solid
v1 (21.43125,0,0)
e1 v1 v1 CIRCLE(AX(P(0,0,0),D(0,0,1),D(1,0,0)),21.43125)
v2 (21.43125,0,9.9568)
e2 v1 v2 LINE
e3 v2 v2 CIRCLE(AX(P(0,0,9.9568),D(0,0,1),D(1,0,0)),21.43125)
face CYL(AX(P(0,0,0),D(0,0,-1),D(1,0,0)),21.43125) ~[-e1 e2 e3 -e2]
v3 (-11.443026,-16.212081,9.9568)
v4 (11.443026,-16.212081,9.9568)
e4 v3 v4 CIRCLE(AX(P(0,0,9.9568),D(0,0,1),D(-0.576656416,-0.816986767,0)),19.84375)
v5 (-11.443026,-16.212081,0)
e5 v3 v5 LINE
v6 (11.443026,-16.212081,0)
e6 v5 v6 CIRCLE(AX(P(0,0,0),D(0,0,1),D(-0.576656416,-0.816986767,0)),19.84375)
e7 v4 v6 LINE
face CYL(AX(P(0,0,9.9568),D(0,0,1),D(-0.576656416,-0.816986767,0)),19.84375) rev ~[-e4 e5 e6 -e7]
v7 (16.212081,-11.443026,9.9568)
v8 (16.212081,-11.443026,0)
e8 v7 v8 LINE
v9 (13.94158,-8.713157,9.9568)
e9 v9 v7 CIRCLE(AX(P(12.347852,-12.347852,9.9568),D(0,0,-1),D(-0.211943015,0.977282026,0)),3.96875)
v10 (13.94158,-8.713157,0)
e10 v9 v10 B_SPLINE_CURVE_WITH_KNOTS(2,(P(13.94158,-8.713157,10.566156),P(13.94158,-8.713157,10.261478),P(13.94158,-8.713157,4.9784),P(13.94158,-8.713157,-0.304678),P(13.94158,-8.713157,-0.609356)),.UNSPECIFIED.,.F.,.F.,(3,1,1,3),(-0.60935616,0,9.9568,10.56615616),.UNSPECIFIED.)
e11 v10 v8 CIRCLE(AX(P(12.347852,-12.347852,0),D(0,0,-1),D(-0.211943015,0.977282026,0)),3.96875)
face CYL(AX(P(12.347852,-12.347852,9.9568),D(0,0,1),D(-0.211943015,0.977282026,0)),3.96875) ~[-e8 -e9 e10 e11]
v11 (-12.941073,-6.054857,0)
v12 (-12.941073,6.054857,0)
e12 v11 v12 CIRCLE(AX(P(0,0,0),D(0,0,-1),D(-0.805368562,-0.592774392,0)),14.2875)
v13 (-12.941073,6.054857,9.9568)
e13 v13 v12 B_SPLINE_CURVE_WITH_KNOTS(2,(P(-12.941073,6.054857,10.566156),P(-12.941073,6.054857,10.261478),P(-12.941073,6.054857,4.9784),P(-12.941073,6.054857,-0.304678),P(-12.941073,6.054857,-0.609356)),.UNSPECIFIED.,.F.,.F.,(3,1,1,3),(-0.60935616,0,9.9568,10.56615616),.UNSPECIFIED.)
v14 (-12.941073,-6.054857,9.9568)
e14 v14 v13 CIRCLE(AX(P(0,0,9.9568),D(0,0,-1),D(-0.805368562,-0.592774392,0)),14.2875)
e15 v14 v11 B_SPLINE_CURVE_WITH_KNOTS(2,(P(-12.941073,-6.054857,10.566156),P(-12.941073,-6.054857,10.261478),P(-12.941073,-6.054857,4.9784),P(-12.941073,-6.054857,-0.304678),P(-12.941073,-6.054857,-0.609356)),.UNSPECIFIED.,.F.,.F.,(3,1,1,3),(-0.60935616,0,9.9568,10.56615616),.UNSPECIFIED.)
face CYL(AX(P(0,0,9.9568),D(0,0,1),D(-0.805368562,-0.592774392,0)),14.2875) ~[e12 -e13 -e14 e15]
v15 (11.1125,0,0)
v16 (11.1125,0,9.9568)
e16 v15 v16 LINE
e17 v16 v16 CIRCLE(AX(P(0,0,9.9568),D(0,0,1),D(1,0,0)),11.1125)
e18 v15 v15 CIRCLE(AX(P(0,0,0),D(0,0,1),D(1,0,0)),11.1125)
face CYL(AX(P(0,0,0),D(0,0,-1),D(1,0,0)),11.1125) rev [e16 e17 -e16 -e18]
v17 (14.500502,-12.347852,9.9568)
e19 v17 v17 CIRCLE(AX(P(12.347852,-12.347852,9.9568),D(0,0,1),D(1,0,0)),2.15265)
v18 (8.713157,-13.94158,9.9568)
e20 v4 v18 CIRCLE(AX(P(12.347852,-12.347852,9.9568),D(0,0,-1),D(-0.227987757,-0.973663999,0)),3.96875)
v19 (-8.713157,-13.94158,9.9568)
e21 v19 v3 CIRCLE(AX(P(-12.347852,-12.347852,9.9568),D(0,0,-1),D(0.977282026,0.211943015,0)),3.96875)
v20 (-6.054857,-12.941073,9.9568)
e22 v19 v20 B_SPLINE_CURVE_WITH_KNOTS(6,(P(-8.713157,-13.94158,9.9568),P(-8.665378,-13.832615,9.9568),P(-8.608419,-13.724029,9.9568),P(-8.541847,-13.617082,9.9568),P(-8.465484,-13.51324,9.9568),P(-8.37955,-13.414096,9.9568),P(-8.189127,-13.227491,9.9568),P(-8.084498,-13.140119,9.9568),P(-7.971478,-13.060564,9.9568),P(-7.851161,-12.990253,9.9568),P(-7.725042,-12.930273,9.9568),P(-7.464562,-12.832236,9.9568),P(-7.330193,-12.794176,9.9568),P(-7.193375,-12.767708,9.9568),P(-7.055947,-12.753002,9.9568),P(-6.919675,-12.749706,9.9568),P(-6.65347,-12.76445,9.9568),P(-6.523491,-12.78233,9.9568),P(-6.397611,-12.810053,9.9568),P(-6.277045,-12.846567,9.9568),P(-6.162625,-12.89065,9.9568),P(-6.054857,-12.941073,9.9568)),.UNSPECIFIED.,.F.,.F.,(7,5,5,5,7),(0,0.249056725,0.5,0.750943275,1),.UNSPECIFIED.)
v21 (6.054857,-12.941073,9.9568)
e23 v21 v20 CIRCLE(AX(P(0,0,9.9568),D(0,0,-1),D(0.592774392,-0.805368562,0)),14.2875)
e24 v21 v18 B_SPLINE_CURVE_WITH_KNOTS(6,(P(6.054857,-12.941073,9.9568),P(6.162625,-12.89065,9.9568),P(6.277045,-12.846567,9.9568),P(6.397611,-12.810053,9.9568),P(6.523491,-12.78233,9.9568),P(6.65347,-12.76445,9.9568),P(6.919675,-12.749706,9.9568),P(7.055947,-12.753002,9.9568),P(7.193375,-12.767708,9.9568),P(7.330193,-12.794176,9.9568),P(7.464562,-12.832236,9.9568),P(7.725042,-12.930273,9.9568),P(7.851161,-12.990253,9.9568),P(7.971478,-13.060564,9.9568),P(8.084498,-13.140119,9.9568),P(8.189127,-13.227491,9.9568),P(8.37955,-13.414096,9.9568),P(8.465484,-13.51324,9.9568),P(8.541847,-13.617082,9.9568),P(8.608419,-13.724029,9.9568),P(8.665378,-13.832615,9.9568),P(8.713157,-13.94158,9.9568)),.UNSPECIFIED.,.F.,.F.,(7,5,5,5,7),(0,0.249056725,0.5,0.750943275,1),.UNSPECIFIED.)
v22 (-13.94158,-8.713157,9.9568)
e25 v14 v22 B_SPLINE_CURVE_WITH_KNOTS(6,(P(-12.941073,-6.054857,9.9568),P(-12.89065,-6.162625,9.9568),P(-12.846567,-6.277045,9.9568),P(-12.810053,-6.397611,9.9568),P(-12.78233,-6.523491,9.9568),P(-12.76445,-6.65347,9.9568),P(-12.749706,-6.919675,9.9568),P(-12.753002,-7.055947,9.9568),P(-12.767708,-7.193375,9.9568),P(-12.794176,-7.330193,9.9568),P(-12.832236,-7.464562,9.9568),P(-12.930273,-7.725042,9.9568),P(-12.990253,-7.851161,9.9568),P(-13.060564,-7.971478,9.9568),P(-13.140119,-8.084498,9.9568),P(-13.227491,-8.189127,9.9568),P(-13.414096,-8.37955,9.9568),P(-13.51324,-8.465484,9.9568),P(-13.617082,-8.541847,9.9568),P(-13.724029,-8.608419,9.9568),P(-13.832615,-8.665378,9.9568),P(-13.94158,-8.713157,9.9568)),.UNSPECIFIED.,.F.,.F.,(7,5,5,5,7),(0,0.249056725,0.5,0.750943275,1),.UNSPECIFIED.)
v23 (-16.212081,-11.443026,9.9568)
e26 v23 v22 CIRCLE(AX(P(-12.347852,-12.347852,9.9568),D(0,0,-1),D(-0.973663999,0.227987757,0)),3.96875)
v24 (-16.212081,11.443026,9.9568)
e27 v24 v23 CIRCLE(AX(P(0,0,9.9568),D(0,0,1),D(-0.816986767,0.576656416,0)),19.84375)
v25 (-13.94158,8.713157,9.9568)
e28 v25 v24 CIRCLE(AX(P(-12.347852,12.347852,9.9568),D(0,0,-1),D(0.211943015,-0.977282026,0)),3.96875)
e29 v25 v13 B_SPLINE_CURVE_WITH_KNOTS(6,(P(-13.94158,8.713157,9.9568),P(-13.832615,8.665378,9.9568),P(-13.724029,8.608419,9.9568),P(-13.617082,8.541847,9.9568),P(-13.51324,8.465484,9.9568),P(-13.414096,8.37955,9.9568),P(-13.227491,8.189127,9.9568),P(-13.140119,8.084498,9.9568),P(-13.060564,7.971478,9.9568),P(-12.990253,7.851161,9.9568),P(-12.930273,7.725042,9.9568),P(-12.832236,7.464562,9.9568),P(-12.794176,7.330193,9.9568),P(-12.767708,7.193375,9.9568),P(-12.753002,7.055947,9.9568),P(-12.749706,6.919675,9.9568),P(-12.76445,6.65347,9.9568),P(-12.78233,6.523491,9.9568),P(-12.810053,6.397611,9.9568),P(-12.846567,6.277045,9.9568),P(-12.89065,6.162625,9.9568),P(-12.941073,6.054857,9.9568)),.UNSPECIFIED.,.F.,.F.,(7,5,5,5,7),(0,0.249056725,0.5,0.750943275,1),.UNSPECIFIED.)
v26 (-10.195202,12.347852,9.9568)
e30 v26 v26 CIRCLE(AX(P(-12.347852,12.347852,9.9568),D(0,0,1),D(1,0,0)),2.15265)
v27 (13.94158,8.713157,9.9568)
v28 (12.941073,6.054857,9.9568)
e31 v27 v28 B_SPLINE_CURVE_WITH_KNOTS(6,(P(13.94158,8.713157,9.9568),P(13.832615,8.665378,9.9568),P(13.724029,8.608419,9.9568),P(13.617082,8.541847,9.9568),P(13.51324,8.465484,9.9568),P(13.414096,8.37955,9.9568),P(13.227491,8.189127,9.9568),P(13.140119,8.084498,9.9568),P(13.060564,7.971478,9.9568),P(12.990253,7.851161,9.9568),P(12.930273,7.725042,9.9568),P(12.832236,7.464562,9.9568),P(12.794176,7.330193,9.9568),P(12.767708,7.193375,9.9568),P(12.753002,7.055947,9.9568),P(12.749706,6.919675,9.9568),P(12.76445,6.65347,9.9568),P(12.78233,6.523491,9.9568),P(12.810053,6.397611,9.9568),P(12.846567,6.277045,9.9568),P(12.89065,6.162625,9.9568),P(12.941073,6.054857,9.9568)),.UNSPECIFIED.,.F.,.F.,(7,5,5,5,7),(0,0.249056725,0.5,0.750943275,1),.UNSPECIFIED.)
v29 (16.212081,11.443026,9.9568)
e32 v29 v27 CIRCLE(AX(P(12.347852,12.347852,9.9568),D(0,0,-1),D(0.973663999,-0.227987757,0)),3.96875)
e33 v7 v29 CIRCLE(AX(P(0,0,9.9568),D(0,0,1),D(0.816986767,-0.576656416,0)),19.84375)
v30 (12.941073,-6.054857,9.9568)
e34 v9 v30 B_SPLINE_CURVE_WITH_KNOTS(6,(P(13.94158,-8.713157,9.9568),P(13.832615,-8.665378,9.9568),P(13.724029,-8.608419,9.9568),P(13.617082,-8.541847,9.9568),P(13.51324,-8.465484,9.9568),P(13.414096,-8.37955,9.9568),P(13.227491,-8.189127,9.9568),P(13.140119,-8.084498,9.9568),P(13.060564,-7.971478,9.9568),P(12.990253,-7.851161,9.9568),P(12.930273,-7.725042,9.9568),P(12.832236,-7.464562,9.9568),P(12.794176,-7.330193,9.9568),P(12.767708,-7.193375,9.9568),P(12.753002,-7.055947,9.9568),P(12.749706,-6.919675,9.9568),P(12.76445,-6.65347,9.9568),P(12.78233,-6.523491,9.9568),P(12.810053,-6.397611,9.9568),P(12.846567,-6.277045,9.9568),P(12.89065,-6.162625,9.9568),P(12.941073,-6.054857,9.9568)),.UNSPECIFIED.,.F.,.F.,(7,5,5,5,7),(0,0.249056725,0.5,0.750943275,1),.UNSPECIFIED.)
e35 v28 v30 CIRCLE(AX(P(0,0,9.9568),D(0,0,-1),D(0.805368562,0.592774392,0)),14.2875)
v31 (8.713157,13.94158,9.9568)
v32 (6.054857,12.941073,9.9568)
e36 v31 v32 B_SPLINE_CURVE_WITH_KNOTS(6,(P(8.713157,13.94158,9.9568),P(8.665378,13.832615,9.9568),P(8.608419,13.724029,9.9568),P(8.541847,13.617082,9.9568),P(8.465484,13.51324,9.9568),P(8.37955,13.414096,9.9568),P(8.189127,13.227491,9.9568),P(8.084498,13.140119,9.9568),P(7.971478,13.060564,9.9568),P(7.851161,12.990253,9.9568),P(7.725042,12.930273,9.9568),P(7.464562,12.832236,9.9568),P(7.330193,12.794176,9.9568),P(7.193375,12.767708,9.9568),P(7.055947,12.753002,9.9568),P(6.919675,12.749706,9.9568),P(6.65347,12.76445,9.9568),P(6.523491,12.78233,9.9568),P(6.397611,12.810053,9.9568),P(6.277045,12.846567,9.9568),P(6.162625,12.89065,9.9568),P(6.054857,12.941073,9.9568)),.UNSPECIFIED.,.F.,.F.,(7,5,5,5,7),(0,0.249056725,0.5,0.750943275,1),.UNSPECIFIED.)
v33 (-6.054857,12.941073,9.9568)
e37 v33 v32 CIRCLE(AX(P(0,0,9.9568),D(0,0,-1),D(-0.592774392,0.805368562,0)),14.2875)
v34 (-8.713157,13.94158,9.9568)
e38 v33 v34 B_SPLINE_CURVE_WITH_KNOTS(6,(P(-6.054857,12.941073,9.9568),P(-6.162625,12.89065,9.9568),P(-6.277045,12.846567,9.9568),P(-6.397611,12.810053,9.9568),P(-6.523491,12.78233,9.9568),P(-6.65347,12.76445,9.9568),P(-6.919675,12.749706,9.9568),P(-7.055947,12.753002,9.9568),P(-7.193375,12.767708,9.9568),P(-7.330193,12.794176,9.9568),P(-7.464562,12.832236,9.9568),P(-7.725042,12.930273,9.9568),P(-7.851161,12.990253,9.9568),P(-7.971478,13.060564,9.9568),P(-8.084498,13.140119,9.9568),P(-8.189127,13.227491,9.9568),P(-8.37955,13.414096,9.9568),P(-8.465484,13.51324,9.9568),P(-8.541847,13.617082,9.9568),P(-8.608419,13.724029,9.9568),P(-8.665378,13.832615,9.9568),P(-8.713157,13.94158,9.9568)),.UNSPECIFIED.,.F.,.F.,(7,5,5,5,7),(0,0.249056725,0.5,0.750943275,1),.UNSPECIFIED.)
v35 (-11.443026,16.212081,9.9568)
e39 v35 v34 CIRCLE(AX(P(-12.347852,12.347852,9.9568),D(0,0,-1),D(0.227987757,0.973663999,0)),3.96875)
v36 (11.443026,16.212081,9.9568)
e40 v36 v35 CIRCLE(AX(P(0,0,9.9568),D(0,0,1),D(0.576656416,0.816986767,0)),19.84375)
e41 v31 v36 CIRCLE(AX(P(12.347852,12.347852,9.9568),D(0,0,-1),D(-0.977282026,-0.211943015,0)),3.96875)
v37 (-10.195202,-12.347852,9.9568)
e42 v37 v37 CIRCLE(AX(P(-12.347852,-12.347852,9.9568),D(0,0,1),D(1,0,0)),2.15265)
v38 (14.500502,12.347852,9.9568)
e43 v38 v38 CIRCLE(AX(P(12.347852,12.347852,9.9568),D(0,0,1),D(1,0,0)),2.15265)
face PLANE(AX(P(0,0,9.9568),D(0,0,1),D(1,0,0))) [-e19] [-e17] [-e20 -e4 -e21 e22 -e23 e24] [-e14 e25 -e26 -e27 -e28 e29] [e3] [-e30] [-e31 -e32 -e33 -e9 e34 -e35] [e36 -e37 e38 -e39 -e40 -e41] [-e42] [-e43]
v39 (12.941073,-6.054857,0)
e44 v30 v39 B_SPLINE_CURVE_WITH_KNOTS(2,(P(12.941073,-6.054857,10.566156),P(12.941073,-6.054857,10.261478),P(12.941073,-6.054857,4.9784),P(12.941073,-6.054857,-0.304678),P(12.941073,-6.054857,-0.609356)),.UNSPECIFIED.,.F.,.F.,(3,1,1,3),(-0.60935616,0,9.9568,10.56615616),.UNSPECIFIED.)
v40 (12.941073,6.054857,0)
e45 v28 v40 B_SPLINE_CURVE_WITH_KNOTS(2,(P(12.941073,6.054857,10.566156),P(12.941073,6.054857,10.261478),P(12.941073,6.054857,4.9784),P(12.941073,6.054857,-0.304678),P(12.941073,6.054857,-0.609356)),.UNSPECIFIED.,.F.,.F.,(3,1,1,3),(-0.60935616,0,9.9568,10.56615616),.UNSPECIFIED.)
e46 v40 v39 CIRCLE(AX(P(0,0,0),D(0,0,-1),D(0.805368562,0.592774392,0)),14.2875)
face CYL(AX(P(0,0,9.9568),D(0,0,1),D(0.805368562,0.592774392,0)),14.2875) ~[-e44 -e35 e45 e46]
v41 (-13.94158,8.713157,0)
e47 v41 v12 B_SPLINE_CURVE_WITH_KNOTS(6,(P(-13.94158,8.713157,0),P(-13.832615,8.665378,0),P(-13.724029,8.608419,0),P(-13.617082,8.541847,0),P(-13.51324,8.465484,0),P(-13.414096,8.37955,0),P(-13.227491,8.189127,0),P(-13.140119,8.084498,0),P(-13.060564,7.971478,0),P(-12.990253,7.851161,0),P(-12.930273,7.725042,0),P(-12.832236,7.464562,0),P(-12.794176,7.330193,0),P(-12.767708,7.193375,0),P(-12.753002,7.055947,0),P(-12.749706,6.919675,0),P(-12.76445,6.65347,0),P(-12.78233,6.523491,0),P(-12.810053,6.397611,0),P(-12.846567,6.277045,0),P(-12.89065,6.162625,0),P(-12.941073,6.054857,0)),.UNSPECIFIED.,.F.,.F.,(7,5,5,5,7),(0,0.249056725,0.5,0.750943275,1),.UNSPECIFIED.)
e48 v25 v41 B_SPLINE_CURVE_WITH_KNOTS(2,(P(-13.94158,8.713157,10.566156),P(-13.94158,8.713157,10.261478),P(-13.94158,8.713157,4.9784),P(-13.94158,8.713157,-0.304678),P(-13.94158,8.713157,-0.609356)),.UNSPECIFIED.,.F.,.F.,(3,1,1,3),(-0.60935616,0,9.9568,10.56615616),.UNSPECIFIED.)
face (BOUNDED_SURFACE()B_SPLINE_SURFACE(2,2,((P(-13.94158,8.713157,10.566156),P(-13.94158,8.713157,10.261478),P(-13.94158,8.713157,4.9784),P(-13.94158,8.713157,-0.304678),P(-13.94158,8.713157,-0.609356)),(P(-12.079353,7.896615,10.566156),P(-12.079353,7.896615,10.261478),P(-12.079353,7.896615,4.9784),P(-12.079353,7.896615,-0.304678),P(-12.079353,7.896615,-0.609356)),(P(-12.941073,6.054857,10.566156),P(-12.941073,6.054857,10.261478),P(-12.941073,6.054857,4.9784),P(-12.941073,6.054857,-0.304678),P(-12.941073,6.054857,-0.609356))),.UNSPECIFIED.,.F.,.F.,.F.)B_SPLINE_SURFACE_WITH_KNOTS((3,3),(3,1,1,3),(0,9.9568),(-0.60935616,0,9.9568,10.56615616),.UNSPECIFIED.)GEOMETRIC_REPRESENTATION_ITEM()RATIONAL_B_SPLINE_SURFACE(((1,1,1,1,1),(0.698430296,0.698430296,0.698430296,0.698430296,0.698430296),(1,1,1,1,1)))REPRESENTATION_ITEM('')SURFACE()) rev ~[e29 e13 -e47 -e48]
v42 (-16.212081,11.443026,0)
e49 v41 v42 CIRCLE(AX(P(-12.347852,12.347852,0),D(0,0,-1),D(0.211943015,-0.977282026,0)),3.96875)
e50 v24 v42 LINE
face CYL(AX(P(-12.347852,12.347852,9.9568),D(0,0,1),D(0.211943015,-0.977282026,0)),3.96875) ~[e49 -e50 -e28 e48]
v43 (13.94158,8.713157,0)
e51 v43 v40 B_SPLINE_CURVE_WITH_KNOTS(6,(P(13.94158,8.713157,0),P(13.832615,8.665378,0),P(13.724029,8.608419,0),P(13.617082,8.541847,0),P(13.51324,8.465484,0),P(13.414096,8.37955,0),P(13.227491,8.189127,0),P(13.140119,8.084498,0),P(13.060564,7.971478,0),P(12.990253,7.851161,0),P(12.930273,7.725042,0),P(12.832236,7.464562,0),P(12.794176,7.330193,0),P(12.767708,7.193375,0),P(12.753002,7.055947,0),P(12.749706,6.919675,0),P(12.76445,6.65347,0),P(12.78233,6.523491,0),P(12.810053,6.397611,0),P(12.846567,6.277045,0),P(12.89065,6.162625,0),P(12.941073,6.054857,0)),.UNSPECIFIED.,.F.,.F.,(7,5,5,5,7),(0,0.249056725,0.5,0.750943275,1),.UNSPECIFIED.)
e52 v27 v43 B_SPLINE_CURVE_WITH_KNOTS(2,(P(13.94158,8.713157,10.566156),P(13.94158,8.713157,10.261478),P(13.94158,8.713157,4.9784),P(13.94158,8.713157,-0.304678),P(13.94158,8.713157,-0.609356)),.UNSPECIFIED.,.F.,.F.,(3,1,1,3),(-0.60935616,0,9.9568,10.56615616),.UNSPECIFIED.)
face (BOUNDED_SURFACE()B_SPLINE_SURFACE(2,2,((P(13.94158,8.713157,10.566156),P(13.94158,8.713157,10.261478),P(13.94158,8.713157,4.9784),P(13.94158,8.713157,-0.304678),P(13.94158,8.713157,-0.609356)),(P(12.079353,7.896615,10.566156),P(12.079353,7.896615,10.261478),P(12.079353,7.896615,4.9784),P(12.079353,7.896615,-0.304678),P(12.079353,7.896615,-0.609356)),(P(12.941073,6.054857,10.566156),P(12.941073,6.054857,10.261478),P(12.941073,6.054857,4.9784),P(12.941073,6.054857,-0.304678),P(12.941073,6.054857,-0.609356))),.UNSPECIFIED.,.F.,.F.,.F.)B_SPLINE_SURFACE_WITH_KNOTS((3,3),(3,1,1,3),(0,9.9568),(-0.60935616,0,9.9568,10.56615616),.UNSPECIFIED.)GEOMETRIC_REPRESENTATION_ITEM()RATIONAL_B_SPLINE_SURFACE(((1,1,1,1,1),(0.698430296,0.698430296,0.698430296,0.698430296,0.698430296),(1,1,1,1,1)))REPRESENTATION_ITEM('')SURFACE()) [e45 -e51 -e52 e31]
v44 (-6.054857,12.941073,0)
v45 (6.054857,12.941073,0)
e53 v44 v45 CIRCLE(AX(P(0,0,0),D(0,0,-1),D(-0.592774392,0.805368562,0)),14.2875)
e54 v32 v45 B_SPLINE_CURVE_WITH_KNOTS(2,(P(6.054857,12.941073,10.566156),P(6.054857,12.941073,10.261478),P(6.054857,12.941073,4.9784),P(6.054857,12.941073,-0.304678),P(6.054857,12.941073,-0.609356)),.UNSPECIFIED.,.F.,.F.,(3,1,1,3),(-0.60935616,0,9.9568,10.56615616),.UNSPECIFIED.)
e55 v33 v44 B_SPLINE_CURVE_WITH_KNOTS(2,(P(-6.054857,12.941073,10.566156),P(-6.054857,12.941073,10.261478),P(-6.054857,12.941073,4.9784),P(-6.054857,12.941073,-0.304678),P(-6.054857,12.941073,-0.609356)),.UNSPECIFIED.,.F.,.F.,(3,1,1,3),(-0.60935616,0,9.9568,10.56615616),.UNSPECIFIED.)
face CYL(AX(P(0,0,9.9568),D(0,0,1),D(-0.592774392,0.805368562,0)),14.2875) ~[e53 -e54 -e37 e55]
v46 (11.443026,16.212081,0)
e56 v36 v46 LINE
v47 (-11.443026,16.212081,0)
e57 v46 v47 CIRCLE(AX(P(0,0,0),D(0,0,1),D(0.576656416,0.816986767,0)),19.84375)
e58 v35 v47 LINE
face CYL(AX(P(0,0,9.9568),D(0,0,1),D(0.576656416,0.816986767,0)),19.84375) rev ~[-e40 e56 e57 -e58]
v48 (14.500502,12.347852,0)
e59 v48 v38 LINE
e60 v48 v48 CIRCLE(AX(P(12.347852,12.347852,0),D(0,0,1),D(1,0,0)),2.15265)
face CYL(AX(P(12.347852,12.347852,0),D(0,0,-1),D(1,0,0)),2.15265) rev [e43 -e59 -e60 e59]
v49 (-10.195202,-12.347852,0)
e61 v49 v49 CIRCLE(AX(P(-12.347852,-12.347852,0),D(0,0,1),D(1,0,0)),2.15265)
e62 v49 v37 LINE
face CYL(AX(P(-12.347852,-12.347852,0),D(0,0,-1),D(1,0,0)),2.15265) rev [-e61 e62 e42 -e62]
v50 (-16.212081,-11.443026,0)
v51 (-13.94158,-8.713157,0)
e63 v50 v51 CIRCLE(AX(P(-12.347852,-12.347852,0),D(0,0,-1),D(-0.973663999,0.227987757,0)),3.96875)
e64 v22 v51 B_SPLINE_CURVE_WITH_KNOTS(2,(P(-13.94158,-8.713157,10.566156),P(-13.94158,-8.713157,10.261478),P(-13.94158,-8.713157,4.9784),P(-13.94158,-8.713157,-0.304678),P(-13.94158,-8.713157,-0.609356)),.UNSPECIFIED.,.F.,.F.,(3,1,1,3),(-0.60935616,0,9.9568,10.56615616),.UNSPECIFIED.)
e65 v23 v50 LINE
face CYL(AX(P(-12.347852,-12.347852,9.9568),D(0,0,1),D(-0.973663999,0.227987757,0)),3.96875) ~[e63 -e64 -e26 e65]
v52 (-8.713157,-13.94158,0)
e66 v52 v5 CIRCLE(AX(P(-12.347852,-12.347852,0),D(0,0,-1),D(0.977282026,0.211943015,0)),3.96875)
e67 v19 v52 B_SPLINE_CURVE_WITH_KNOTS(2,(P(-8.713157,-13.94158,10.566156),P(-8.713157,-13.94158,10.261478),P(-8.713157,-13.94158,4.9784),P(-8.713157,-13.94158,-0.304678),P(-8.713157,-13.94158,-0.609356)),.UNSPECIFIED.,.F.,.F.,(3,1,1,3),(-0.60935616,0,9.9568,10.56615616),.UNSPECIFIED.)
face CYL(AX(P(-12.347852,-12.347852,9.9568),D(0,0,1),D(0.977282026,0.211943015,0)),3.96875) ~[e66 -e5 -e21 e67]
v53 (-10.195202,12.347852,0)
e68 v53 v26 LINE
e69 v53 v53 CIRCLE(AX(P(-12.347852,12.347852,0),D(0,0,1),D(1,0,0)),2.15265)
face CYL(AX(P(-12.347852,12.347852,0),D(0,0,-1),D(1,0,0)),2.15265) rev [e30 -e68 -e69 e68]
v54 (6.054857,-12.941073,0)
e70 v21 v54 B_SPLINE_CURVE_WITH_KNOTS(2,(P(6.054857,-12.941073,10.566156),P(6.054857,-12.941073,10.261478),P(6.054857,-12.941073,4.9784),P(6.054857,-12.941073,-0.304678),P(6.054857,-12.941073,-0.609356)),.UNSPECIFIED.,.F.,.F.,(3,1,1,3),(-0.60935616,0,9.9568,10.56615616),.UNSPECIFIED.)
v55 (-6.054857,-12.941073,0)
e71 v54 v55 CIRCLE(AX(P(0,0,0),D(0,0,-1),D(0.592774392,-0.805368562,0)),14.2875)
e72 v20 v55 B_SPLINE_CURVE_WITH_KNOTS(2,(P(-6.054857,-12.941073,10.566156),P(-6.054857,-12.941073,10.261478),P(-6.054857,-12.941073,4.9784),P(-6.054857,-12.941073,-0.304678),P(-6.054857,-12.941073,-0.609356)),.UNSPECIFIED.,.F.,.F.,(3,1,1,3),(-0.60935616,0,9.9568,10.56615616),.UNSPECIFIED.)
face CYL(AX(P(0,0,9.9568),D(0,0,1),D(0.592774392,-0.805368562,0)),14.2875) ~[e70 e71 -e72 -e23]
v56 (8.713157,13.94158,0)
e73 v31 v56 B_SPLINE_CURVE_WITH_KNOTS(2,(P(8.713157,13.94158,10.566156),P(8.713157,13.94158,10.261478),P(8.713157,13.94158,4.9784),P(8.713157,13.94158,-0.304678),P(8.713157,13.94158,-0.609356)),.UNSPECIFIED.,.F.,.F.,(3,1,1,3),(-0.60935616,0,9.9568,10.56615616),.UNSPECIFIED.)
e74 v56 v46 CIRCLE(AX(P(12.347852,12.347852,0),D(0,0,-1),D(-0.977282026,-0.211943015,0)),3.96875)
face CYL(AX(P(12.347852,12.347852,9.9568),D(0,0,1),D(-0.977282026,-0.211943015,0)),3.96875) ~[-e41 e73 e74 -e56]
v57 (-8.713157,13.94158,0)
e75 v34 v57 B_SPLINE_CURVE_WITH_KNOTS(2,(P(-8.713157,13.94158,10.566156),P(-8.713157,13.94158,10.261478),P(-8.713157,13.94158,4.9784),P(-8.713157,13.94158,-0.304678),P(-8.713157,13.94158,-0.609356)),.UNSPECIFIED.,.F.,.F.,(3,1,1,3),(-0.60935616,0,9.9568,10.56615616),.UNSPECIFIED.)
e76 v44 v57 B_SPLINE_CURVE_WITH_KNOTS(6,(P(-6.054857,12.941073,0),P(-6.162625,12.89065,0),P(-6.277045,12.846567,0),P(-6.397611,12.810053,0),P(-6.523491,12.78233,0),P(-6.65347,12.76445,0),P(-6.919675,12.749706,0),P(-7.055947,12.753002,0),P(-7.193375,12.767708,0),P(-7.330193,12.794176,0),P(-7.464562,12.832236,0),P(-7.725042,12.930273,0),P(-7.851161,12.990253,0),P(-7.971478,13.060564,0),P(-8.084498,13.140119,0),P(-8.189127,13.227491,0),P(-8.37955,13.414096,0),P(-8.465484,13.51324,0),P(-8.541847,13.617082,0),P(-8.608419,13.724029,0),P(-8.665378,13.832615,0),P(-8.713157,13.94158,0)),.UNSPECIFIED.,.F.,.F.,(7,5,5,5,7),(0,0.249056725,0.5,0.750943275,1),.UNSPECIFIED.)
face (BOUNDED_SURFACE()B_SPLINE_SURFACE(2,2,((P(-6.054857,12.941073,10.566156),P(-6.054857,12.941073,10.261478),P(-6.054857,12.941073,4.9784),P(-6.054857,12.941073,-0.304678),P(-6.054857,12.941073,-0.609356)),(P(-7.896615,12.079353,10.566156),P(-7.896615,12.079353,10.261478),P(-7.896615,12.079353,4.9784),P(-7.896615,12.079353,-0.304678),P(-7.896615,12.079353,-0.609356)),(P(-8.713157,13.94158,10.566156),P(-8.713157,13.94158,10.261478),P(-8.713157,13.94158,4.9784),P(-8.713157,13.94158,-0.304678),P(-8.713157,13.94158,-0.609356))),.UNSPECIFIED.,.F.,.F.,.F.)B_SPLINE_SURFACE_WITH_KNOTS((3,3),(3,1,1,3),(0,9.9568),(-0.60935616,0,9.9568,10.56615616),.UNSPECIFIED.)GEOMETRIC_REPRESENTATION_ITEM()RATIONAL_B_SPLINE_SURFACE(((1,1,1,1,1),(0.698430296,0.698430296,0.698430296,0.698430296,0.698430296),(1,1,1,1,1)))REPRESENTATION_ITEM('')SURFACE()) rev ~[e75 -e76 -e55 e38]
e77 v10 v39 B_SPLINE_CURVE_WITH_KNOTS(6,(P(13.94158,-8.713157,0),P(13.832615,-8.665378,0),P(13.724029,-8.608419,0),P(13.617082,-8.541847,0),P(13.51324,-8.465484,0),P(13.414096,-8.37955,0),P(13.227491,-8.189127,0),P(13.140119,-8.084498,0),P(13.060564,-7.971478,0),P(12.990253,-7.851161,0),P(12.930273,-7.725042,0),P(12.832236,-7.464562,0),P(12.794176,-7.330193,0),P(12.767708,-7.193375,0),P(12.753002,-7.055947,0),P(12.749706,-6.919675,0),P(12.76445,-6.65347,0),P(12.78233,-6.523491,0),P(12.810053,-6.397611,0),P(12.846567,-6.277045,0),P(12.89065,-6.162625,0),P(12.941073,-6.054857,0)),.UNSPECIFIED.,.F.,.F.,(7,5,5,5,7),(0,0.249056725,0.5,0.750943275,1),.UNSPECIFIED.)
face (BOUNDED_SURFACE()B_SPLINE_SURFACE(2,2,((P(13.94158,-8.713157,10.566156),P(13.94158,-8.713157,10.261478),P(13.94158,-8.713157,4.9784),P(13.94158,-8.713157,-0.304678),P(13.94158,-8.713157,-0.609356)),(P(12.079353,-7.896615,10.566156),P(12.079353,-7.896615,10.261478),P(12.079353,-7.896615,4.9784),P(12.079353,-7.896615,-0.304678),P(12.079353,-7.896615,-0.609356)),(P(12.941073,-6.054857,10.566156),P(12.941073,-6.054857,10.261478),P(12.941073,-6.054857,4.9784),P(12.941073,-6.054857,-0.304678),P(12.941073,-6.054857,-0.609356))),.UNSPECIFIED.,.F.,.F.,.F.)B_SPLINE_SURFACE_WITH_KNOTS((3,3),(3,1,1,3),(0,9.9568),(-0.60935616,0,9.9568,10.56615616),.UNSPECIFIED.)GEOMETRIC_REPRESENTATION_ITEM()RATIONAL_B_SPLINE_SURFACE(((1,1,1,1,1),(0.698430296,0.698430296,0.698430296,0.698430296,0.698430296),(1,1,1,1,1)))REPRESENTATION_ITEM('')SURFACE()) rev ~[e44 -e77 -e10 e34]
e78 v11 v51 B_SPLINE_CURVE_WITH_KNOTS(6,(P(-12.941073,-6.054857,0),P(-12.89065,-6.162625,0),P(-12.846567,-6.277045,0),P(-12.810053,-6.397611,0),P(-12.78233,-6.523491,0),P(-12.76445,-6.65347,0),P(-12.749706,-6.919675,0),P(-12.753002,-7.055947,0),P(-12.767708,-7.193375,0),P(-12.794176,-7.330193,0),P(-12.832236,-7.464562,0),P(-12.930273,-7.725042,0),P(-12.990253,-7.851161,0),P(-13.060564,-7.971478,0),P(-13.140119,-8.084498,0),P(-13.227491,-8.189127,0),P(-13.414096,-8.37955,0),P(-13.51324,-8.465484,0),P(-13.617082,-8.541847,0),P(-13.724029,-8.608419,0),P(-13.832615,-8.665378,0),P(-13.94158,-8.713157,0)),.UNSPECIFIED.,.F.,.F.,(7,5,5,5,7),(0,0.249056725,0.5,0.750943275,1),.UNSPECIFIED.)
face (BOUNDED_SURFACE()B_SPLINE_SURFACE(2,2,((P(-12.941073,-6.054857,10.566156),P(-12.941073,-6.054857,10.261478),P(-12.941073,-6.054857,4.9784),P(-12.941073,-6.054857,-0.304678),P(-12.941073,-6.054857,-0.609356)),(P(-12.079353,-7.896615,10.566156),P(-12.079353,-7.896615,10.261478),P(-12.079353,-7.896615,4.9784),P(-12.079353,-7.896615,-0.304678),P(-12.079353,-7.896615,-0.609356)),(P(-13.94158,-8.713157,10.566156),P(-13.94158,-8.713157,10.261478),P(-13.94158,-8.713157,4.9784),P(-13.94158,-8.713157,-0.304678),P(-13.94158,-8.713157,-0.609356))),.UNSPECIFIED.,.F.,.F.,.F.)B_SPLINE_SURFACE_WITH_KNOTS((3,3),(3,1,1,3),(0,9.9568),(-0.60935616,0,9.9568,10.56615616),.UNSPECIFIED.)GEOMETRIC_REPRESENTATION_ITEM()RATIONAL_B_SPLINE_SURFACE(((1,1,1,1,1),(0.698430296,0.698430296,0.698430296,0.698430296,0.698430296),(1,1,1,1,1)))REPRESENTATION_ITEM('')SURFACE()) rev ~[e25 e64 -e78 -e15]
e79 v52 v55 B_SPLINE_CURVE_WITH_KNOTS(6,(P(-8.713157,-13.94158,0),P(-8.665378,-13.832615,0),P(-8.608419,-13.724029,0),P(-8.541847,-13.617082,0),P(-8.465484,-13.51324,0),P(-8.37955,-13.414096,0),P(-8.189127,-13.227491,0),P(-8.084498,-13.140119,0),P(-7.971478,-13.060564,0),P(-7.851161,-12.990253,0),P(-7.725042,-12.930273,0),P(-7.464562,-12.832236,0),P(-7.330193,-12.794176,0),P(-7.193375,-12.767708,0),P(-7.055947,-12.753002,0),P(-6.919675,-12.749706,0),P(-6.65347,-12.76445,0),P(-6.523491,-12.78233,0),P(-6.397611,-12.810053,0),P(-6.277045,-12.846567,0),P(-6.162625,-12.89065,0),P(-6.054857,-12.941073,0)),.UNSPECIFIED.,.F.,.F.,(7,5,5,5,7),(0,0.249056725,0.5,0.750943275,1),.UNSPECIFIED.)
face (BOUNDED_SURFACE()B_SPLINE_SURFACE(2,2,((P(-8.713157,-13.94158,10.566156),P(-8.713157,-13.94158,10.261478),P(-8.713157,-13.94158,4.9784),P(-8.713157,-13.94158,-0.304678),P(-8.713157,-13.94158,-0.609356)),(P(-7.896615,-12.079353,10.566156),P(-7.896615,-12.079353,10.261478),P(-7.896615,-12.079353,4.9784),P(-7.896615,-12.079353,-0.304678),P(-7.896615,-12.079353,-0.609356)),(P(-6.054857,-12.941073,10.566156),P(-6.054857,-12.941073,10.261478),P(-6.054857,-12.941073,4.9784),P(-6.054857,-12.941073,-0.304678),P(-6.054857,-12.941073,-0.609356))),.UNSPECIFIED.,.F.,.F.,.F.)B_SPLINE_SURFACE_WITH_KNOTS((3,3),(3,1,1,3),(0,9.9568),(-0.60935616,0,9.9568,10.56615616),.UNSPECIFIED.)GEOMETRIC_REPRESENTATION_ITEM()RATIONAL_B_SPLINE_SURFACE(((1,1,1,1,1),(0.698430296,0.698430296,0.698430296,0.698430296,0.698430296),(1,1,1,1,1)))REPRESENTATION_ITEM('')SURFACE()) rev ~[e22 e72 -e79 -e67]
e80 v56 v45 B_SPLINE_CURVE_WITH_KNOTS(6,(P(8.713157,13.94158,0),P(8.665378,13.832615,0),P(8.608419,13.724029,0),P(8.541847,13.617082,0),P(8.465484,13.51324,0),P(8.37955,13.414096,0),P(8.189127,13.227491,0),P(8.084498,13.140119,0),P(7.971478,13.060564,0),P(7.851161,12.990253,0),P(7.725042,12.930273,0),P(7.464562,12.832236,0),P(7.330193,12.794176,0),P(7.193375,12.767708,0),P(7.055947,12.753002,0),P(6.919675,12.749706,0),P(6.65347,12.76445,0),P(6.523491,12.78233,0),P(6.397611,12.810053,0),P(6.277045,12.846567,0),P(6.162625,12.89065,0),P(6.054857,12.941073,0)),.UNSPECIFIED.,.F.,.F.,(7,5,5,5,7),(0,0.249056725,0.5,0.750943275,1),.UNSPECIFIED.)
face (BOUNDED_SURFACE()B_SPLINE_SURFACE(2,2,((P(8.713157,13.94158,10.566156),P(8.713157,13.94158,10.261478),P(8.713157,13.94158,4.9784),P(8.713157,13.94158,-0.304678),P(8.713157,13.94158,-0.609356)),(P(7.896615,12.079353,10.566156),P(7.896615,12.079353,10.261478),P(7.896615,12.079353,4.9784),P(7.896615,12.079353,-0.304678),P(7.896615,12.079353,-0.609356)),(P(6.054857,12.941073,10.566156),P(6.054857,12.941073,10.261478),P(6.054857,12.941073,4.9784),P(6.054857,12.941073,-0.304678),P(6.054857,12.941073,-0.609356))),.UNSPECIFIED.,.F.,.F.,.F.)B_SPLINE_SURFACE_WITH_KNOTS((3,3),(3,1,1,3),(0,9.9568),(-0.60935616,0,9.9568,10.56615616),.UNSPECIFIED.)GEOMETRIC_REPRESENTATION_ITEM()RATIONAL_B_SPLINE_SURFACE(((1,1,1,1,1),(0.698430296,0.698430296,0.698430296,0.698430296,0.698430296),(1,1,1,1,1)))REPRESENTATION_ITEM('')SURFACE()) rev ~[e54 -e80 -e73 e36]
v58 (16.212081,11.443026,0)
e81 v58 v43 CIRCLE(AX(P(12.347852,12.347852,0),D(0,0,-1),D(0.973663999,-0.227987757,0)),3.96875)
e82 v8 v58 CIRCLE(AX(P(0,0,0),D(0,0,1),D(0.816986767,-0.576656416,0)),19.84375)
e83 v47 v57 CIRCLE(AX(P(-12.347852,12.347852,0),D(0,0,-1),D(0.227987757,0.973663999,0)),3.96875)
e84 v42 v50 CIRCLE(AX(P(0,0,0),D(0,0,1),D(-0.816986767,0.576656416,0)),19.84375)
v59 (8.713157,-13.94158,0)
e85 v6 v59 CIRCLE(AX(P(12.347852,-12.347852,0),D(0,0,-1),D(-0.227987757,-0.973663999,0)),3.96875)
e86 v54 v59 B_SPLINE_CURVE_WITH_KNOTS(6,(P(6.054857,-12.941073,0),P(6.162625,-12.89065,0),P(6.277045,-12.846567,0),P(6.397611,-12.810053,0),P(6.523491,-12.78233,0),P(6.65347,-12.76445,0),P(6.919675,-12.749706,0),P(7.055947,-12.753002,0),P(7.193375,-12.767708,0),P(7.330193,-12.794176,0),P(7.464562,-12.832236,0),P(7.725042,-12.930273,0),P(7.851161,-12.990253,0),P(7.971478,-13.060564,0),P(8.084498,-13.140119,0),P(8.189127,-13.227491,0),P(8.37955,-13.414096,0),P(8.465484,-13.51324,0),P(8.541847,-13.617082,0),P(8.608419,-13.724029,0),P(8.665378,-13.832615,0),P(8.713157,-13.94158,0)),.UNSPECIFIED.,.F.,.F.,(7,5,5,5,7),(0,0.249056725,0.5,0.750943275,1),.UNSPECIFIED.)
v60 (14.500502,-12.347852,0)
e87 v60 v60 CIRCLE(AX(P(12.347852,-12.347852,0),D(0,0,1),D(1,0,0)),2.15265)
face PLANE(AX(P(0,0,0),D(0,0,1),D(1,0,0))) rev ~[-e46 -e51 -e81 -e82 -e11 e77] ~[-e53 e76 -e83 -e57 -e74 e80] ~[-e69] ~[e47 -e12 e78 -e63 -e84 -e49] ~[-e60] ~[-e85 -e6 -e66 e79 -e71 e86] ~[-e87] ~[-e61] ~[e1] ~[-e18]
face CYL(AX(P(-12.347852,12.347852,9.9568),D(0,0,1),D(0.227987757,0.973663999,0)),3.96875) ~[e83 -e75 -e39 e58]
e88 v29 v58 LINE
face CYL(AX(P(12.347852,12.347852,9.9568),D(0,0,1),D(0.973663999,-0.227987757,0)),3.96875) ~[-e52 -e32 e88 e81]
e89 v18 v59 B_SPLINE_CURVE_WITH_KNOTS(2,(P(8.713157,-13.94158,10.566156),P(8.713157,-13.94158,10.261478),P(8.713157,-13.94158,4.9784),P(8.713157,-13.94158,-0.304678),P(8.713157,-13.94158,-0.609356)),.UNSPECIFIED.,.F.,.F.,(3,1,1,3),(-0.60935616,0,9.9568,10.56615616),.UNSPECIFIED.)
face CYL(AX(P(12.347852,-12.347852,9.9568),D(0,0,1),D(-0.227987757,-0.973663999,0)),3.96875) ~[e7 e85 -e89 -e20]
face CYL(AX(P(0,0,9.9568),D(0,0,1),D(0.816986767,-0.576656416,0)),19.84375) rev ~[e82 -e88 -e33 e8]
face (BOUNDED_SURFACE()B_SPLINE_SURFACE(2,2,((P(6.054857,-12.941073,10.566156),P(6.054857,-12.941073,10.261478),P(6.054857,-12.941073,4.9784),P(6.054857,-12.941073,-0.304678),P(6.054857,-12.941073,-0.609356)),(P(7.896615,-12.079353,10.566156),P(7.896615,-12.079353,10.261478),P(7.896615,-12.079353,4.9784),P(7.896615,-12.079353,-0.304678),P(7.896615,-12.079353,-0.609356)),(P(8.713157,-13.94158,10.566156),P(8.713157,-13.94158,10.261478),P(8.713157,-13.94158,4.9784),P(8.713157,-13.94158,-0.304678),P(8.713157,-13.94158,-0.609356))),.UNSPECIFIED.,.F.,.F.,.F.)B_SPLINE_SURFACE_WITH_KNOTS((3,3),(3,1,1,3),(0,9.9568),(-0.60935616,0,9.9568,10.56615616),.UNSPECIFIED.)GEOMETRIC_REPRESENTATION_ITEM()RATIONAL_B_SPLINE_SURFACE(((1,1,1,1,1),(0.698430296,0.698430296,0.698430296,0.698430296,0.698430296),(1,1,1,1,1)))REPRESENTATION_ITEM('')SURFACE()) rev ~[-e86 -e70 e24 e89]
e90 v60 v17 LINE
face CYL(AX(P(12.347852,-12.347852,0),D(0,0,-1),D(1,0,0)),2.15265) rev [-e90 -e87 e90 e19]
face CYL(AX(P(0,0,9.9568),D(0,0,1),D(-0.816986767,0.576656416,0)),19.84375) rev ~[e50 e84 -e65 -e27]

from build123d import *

# Parameters (mm, degrees)
F0_R            = 21.43125
F0_R_2          = 2.15265
F0_R_3          = 11.1125
F1_DEPTH        = 9.9568
F3_DEPTH        = 9.9568
F3_COPIES_COUNT = 4
F4_R            = 1.984375


# Not quite as in the source:
# - a pattern or mirror of a feature is missing from the dataset's text; its kind, count and spacing are read off the source's solid


with BuildPart() as f1:
    # F0 (on Top) → F1 (new body)
    with BuildSketch(Plane.XY):
        Circle(F0_R)
        with Locations((-12.3478521665, -12.3478521665)):
            Circle(F0_R_2, mode=Mode.SUBTRACT)
        with Locations((12.3478521665, -12.3478521665)):
            Circle(F0_R_2, mode=Mode.SUBTRACT)
        with Locations((-12.3478521665, 12.3478521665)):
            Circle(F0_R_2, mode=Mode.SUBTRACT)
        Circle(F0_R_3, mode=Mode.SUBTRACT)
        with Locations((12.3478521665, 12.3478521665)):
            Circle(F0_R_2, mode=Mode.SUBTRACT)
    extrude(amount=F1_DEPTH)

    # F2 (on face) → F3 (cut, through all)
    with BuildSketch(Plane.XY.offset(9.9568)):
        with BuildLine():
            ThreePointArc((8.4692641257, 11.5067033254), (8.9929440308, 14.4681276118), (11.4430257563, 16.212081162))
            ThreePointArc((11.4430257563, 16.212081162), (0, 19.84375), (-11.4430257563, 16.212081162))
            ThreePointArc((-11.4430257563, 16.212081162), (-8.9929440308, 14.4681276118), (-8.4692641257, 11.5067033254))
            ThreePointArc((-8.4692641257, 11.5067033254), (0, 14.2875), (8.4692641257, 11.5067033254))
        make_face()
    f3 = extrude(amount=-F3_DEPTH, mode=Mode.SUBTRACT)

    # F3_copies: F3 ×4 about axis
    f3_copies_axis = Axis((0, 0, 0), (0, 0, 1))
    for i in range(1, F3_COPIES_COUNT):
        add(f3.rotate(f3_copies_axis, i * 360 / F3_COPIES_COUNT), mode=Mode.SUBTRACT)

    # F4
    f4_edges = [f1.edges().sort_by_distance(p)[0] for p in [
        (8.469264, 11.506703, 4.9784),
        (-8.469264, 11.506703, 4.9784),
        (8.469264, -11.506703, 4.9784),
        (-8.469264, -11.506703, 4.9784),
        (11.506703, 8.469264, 4.9784),
        (11.506703, -8.469264, 4.9784),
        (-11.506703, -8.469264, 4.9784),
        (-11.506703, 8.469264, 4.9784),
    ]]
    fillet(f4_edges, radius=F4_R)


solid = f1.part
